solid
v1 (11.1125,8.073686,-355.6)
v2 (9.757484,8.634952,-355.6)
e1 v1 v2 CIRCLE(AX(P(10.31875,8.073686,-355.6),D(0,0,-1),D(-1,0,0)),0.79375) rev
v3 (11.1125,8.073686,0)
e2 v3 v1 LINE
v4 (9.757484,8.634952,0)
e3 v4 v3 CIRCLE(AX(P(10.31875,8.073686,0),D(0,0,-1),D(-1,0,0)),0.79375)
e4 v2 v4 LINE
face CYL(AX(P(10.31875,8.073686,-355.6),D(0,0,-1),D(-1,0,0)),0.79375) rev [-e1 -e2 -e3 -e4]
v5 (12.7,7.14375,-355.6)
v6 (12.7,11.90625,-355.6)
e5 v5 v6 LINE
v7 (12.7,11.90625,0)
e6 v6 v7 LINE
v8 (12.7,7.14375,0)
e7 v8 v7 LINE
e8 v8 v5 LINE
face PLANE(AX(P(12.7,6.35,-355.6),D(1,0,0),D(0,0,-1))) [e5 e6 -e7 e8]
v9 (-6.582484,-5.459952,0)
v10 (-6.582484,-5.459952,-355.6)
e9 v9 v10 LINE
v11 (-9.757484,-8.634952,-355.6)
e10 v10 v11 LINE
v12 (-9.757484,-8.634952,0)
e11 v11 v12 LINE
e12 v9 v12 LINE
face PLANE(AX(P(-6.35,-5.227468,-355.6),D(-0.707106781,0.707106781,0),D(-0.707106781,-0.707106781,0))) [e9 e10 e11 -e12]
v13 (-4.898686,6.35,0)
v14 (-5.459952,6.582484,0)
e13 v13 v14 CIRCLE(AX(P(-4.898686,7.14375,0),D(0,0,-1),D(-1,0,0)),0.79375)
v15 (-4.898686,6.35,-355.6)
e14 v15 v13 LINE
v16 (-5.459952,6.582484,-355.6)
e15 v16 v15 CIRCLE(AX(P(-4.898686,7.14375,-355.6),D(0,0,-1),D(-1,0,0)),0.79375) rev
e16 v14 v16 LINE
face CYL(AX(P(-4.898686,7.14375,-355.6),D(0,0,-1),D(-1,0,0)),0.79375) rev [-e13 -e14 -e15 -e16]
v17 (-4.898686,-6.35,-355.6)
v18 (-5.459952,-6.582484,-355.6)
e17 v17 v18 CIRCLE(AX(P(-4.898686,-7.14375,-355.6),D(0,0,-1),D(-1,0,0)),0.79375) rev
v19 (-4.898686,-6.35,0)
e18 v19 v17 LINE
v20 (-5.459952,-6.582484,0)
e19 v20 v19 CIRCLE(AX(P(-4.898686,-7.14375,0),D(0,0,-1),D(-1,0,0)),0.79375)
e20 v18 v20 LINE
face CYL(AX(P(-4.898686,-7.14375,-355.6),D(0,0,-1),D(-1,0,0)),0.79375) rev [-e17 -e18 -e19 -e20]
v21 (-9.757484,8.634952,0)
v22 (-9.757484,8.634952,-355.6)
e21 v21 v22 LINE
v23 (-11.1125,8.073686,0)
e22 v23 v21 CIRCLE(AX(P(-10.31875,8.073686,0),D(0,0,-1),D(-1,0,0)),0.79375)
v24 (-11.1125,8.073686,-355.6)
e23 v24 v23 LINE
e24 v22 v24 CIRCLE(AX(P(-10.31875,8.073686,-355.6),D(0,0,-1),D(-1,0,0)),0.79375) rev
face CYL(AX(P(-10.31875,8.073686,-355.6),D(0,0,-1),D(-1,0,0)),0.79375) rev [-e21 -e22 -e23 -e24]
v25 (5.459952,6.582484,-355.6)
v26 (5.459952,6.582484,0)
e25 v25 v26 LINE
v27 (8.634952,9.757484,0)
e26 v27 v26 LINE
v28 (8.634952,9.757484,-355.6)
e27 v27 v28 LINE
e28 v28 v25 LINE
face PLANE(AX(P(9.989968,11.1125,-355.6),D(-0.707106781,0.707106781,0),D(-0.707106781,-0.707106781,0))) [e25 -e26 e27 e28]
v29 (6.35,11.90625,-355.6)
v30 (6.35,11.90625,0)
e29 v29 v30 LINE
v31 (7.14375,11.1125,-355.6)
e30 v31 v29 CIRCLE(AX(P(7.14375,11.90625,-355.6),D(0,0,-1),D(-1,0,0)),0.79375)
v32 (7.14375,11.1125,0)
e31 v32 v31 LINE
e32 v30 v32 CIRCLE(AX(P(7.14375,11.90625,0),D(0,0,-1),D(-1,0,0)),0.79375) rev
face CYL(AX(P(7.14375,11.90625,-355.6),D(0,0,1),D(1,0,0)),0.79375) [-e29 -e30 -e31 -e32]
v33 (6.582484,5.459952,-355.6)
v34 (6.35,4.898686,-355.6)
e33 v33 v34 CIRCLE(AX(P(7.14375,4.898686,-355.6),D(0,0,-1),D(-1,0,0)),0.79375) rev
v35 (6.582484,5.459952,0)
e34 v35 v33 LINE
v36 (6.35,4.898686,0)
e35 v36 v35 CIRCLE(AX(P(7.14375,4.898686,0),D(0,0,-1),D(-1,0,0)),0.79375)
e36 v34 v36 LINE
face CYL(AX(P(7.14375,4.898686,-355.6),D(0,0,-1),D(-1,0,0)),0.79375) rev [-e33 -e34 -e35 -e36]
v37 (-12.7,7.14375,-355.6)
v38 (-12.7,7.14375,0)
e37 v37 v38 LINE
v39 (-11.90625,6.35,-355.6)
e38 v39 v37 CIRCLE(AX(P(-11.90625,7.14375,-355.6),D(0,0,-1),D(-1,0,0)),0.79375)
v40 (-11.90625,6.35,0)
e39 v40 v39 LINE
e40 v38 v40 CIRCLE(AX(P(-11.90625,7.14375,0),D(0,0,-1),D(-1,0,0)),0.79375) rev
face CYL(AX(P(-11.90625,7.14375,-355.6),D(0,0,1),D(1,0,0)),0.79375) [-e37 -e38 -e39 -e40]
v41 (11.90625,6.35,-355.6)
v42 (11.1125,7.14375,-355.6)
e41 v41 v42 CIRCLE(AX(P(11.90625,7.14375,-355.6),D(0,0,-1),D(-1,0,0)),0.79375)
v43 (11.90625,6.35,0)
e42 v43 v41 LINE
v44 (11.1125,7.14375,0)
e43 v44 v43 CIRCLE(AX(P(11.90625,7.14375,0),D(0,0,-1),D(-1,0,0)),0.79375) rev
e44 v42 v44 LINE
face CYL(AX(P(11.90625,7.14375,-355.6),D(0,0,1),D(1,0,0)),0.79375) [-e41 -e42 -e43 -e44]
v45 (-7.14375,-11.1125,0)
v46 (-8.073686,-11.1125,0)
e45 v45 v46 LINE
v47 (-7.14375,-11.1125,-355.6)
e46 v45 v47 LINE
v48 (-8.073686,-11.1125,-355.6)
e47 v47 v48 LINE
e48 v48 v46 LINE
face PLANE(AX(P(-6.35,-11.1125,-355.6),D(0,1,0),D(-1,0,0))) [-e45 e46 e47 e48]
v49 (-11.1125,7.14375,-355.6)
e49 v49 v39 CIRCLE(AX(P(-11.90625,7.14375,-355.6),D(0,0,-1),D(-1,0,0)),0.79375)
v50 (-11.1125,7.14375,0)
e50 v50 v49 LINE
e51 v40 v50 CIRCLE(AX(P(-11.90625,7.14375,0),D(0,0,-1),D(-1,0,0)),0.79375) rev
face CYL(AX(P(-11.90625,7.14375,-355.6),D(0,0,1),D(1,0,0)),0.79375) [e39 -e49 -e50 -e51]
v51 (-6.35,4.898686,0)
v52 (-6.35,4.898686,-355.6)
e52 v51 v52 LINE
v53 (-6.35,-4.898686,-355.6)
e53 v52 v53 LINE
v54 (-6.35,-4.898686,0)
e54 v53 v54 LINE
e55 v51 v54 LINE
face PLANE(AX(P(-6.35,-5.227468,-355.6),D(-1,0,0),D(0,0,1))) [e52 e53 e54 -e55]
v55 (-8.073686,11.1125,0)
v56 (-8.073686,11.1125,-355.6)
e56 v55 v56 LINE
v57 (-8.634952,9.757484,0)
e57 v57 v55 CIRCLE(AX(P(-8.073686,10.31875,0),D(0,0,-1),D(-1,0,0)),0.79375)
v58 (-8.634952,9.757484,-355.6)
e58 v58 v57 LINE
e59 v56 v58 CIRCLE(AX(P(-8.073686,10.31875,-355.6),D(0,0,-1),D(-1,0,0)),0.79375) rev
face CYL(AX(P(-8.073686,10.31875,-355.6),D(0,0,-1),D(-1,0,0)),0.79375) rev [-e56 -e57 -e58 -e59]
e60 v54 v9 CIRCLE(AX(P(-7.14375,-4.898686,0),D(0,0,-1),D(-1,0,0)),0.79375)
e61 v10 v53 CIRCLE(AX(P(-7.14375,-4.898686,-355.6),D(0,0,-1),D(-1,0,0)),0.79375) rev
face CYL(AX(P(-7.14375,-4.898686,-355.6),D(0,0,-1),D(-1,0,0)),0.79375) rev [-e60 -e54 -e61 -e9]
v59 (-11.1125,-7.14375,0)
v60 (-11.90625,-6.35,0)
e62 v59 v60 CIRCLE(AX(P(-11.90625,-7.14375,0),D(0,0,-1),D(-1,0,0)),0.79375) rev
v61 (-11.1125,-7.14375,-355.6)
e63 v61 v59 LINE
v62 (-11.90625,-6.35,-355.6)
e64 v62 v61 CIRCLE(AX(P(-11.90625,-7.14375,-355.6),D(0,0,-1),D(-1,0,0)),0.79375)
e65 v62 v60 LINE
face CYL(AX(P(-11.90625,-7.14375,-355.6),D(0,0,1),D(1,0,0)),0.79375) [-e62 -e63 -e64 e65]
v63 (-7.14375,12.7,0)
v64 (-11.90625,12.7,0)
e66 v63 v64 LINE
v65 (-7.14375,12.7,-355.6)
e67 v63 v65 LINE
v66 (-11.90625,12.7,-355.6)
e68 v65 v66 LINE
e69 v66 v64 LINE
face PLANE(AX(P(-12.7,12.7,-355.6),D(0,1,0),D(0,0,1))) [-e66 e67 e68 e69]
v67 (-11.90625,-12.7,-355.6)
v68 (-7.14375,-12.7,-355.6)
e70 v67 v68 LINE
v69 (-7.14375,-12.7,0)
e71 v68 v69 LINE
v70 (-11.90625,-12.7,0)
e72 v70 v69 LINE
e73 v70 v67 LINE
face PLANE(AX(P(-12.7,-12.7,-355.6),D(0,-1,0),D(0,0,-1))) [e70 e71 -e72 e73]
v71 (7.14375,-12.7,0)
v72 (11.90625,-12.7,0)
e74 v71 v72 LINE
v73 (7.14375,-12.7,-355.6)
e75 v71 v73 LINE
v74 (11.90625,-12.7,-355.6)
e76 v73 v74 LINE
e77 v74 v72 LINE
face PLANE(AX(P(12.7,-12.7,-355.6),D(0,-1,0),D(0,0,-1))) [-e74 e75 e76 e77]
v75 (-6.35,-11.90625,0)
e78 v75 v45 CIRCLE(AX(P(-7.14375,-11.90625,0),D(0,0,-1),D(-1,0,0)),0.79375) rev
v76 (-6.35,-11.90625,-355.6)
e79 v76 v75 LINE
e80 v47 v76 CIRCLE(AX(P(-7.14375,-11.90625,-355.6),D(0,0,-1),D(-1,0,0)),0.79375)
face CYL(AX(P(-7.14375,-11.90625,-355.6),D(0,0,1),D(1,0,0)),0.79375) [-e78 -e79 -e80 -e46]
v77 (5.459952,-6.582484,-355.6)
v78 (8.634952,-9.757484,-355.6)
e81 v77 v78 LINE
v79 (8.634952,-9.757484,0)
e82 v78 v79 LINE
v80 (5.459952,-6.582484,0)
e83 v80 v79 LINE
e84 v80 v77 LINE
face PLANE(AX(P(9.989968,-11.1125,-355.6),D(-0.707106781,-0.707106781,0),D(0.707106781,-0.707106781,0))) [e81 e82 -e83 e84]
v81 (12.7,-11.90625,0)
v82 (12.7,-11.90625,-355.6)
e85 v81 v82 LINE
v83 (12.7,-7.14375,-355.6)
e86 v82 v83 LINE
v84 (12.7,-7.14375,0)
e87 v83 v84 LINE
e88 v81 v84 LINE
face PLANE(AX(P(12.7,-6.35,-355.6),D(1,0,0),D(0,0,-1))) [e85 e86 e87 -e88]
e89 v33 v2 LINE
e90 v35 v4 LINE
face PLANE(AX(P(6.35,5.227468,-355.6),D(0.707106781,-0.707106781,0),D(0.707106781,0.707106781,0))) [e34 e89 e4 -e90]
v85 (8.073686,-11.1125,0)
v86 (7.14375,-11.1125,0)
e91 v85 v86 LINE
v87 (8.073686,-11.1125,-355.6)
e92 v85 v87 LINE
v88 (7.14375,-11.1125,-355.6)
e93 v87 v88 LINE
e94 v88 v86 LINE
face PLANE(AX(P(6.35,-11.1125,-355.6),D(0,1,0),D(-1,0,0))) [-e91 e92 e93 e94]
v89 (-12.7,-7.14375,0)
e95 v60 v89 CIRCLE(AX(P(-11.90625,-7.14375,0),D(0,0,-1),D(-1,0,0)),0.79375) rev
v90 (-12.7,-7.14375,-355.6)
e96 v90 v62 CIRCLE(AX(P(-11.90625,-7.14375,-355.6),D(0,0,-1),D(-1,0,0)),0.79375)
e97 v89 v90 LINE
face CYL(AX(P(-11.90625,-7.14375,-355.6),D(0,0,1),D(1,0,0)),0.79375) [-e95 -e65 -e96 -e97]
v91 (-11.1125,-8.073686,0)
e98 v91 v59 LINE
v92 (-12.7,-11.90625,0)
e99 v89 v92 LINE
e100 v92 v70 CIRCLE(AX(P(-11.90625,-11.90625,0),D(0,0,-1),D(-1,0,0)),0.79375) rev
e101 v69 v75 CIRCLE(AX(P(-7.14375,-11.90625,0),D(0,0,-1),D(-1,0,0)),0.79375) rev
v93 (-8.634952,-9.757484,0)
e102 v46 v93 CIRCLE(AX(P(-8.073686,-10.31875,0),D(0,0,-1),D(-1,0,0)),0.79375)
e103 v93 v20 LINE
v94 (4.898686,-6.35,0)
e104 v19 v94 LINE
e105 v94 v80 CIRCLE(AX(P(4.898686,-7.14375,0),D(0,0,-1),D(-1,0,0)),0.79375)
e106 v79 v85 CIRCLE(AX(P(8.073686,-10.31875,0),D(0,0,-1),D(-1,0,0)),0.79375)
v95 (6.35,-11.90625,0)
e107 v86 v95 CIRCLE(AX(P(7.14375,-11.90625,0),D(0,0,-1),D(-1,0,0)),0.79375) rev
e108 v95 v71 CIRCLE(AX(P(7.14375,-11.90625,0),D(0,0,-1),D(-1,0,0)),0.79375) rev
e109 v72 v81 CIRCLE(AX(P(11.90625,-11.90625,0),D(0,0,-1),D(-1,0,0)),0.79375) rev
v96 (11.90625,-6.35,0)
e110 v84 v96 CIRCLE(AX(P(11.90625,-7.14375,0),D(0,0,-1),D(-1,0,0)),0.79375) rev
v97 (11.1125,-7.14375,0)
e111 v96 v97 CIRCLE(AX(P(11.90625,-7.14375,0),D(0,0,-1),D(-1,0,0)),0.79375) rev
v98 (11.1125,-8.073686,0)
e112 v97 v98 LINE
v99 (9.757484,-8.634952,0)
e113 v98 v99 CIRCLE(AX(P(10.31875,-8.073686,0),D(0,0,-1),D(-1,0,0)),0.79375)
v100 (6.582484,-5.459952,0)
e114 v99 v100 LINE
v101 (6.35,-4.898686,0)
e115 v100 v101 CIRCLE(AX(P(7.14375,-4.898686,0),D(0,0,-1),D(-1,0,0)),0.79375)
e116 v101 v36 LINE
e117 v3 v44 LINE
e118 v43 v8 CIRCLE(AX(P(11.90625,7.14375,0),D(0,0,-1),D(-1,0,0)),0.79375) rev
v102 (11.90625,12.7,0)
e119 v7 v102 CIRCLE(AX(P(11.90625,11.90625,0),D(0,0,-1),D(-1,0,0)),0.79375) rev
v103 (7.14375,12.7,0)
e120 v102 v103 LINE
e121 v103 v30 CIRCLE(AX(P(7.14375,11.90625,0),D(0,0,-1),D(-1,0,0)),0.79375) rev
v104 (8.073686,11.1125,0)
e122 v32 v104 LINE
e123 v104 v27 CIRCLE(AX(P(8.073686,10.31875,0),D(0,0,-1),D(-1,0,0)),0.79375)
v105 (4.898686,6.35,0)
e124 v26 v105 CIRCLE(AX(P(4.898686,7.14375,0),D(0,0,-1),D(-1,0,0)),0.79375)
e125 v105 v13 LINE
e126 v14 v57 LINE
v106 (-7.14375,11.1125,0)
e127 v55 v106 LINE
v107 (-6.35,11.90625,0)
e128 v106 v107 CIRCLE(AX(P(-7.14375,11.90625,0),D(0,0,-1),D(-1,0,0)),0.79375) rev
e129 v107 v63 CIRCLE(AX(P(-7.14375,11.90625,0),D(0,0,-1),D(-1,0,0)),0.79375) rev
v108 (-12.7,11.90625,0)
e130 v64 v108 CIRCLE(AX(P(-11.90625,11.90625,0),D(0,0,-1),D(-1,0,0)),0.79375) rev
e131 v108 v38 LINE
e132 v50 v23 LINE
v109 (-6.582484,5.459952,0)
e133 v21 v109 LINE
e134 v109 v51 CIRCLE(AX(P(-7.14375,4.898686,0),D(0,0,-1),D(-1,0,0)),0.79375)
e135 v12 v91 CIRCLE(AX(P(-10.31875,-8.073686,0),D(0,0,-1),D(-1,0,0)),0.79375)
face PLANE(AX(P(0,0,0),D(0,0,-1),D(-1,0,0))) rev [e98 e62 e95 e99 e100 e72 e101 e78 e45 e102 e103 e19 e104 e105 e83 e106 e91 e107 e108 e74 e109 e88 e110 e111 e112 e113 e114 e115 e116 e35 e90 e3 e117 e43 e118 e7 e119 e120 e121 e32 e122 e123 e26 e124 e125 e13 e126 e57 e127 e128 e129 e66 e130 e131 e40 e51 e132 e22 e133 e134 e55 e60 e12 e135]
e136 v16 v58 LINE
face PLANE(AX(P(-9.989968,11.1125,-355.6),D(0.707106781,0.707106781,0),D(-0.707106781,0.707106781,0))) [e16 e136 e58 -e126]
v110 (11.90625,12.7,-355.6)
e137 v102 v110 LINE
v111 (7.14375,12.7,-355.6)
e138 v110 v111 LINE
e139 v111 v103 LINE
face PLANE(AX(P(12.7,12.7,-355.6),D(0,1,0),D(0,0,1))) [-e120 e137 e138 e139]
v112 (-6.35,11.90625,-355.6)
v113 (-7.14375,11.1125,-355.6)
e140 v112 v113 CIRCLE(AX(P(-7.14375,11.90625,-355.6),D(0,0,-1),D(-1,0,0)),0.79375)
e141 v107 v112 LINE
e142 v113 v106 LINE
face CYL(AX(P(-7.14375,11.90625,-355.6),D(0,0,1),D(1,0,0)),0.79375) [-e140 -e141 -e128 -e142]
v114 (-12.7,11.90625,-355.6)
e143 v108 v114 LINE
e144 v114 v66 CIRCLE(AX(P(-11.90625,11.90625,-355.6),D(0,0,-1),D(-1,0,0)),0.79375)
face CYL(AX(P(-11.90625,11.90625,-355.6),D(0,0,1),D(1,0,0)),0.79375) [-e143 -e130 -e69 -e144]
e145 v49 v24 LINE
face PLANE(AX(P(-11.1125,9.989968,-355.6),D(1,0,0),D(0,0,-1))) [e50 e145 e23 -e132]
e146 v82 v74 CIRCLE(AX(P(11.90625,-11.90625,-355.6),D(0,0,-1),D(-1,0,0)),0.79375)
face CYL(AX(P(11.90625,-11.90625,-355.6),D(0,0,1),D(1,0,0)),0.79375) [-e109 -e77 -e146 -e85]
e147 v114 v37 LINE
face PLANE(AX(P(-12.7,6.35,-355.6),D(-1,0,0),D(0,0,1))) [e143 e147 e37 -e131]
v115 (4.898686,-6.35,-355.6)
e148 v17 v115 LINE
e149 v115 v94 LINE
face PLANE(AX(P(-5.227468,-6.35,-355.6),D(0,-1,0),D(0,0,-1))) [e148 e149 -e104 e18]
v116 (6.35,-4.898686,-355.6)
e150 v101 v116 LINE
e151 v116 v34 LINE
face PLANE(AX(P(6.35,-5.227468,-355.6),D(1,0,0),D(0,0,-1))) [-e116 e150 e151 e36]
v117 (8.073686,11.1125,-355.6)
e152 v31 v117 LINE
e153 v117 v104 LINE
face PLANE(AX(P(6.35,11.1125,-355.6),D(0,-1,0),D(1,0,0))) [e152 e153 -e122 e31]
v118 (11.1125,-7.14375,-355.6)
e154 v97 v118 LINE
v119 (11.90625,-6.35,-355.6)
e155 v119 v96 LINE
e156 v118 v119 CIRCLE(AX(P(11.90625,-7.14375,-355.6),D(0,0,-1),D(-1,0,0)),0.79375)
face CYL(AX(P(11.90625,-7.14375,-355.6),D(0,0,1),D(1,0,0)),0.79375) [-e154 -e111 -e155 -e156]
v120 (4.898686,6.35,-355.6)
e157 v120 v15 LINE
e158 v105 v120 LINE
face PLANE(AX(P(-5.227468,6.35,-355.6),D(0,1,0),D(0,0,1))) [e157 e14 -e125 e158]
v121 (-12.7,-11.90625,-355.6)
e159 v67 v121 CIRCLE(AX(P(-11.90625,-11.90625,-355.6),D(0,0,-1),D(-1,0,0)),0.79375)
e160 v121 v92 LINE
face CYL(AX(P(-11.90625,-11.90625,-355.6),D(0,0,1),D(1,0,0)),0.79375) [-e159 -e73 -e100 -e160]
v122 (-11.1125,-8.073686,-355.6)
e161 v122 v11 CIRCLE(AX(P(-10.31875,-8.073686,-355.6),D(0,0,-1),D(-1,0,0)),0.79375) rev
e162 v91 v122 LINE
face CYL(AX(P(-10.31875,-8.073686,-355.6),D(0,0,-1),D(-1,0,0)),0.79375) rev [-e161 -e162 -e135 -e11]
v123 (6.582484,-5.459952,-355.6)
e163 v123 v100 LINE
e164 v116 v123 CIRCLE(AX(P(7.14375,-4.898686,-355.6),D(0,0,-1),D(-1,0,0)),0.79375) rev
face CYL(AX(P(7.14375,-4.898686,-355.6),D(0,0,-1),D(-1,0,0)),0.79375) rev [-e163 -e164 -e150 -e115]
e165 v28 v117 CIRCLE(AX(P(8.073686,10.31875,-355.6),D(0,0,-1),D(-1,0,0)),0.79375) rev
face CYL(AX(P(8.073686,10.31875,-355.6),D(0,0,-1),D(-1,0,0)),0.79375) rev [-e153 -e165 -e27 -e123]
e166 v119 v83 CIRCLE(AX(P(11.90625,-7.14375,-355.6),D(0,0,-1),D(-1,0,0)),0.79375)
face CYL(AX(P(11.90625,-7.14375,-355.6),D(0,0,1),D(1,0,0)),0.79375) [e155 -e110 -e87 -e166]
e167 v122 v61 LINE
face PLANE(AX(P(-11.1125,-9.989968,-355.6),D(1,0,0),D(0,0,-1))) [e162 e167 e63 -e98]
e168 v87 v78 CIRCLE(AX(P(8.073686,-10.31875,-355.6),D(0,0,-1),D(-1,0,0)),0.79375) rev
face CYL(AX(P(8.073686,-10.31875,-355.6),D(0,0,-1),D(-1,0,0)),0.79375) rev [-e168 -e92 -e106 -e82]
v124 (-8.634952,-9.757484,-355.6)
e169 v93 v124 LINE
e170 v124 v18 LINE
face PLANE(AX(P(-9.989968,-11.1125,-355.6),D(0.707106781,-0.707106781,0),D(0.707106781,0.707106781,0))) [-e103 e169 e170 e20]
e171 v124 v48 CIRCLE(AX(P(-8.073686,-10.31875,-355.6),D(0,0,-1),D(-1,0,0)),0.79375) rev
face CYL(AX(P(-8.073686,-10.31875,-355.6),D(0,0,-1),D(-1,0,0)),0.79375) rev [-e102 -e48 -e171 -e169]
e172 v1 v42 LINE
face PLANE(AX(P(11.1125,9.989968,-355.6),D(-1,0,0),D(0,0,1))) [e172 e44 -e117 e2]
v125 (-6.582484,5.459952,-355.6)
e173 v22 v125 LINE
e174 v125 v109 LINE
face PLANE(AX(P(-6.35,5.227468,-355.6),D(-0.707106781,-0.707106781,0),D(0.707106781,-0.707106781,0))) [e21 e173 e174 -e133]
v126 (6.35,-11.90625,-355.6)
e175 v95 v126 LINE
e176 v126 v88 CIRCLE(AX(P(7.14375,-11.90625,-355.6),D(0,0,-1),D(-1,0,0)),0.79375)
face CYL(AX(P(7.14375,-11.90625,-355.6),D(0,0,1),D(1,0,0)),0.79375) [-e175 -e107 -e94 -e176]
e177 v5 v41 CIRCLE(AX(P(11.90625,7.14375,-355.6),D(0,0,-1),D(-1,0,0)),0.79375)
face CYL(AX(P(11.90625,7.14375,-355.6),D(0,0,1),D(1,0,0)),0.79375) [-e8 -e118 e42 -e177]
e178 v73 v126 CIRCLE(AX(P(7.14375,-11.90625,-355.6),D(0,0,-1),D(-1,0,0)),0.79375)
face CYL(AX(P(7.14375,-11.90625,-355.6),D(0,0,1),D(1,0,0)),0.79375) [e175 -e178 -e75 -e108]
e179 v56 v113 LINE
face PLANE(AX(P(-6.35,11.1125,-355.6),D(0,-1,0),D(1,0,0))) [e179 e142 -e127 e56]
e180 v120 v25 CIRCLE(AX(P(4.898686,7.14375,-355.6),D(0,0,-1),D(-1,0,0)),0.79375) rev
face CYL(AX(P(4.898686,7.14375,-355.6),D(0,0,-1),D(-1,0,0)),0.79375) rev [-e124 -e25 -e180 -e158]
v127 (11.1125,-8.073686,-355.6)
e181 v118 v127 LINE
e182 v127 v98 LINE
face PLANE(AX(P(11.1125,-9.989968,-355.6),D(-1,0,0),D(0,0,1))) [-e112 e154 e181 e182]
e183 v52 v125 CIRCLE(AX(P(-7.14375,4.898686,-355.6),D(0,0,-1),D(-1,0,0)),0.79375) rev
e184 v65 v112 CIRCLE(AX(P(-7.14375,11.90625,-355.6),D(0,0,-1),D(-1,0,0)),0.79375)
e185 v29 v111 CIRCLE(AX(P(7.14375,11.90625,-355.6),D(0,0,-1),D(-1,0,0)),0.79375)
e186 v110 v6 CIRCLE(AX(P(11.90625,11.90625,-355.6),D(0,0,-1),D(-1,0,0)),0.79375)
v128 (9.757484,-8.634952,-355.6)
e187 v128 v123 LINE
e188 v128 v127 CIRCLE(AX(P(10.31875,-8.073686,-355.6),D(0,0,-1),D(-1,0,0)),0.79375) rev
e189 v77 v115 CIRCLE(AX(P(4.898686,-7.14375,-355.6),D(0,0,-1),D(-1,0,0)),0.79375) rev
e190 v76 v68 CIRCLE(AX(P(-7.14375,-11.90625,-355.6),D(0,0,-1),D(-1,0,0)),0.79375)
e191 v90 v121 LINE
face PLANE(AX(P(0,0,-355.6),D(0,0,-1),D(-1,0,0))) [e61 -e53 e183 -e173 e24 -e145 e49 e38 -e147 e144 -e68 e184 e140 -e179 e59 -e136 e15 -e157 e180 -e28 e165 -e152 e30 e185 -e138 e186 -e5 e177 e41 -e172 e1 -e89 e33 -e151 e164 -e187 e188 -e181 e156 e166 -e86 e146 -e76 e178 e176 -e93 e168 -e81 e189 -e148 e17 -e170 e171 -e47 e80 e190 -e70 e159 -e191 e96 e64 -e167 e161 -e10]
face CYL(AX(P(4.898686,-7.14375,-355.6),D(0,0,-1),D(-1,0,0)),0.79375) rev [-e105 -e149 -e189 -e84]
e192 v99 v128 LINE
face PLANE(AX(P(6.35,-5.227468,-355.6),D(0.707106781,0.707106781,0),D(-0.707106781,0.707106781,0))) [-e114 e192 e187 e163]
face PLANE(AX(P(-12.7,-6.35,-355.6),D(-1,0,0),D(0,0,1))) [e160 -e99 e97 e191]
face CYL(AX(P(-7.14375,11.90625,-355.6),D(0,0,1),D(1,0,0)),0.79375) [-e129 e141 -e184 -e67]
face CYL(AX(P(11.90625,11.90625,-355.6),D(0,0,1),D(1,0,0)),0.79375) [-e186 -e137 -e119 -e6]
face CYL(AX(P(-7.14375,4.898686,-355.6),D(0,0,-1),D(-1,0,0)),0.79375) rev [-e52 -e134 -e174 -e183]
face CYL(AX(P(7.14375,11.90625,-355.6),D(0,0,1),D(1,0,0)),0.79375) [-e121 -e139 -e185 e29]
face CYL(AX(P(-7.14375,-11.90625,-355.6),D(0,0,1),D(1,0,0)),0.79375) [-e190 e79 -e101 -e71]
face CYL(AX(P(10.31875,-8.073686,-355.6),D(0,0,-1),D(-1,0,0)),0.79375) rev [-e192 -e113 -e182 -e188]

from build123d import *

# Parameters (mm, degrees)
BOSS_EXTRUDE1_DEPTH = 355.6
FILLET1_R           = 0.79375


with BuildPart() as part:
    # Sketch1 → Boss-Extrude1 (new body)
    with BuildSketch(Plane.XY):
        Polygon((-6.35, -5.227467985), (-6.35, 5.227467985), (-11.1125, 9.989967985), (-11.1125, 6.35), (-12.7, 6.35), (-12.7, 12.7), (-6.35, 12.7), (-6.35, 11.1125), (-9.989967985, 11.1125), (-5.227467985, 6.35), (5.227467985, 6.35), (9.989967985, 11.1125), (6.35, 11.1125), (6.35, 12.7), (12.7, 12.7), (12.7, 6.35), (11.1125, 6.35), (11.1125, 9.989967985), (6.35, 5.227467985), (6.35, -5.227467985), (11.1125, -9.989967985), (11.1125, -6.35), (12.7, -6.35), (12.7, -12.7), (6.35, -12.7), (6.35, -11.1125), (9.989967985, -11.1125), (5.227467985, -6.35), (-5.227467985, -6.35), (-9.989967985, -11.1125), (-6.35, -11.1125), (-6.35, -12.7), (-12.7, -12.7), (-12.7, -6.35), (-11.1125, -6.35), (-11.1125, -9.989967985), align=None)
    extrude(amount=-BOSS_EXTRUDE1_DEPTH)

    # Fillet1
    fillet1_edges = [part.edges().sort_by_distance(p)[0] for p in [
        (-6.35, -11.1125, -177.8),
        (-6.35, -12.7, -177.8),
        (-12.7, -12.7, -177.8),
        (-12.7, -6.35, -177.8),
        (-11.1125, -6.35, -177.8),
        (-11.1125, -9.989967985, -177.8),
        (-6.35, -5.227467985, -177.8),
        (-6.35, 5.227467985, -177.8),
        (-11.1125, 9.989967985, -177.8),
        (-11.1125, 6.35, -177.8),
        (-12.7, 6.35, -177.8),
        (-12.7, 12.7, -177.8),
        (-6.35, 12.7, -177.8),
        (-6.35, 11.1125, -177.8),
        (-9.989967985, 11.1125, -177.8),
        (-5.227467985, 6.35, -177.8),
        (5.227467985, 6.35, -177.8),
        (9.989967985, 11.1125, -177.8),
        (6.35, 11.1125, -177.8),
        (6.35, 12.7, -177.8),
        (12.7, 12.7, -177.8),
        (12.7, 6.35, -177.8),
        (11.1125, 6.35, -177.8),
        (11.1125, 9.989967985, -177.8),
        (6.35, 5.227467985, -177.8),
        (6.35, -5.227467985, -177.8),
        (11.1125, -9.989967985, -177.8),
        (11.1125, -6.35, -177.8),
        (12.7, -6.35, -177.8),
        (12.7, -12.7, -177.8),
        (6.35, -12.7, -177.8),
        (6.35, -11.1125, -177.8),
        (9.989967985, -11.1125, -177.8),
        (5.227467985, -6.35, -177.8),
        (-5.227467985, -6.35, -177.8),
        (-9.989967985, -11.1125, -177.8),
    ]]
    fillet(fillet1_edges, radius=FILLET1_R - 0.0001)  # a hair under: the kernel refuses the full size


solid = part.part
